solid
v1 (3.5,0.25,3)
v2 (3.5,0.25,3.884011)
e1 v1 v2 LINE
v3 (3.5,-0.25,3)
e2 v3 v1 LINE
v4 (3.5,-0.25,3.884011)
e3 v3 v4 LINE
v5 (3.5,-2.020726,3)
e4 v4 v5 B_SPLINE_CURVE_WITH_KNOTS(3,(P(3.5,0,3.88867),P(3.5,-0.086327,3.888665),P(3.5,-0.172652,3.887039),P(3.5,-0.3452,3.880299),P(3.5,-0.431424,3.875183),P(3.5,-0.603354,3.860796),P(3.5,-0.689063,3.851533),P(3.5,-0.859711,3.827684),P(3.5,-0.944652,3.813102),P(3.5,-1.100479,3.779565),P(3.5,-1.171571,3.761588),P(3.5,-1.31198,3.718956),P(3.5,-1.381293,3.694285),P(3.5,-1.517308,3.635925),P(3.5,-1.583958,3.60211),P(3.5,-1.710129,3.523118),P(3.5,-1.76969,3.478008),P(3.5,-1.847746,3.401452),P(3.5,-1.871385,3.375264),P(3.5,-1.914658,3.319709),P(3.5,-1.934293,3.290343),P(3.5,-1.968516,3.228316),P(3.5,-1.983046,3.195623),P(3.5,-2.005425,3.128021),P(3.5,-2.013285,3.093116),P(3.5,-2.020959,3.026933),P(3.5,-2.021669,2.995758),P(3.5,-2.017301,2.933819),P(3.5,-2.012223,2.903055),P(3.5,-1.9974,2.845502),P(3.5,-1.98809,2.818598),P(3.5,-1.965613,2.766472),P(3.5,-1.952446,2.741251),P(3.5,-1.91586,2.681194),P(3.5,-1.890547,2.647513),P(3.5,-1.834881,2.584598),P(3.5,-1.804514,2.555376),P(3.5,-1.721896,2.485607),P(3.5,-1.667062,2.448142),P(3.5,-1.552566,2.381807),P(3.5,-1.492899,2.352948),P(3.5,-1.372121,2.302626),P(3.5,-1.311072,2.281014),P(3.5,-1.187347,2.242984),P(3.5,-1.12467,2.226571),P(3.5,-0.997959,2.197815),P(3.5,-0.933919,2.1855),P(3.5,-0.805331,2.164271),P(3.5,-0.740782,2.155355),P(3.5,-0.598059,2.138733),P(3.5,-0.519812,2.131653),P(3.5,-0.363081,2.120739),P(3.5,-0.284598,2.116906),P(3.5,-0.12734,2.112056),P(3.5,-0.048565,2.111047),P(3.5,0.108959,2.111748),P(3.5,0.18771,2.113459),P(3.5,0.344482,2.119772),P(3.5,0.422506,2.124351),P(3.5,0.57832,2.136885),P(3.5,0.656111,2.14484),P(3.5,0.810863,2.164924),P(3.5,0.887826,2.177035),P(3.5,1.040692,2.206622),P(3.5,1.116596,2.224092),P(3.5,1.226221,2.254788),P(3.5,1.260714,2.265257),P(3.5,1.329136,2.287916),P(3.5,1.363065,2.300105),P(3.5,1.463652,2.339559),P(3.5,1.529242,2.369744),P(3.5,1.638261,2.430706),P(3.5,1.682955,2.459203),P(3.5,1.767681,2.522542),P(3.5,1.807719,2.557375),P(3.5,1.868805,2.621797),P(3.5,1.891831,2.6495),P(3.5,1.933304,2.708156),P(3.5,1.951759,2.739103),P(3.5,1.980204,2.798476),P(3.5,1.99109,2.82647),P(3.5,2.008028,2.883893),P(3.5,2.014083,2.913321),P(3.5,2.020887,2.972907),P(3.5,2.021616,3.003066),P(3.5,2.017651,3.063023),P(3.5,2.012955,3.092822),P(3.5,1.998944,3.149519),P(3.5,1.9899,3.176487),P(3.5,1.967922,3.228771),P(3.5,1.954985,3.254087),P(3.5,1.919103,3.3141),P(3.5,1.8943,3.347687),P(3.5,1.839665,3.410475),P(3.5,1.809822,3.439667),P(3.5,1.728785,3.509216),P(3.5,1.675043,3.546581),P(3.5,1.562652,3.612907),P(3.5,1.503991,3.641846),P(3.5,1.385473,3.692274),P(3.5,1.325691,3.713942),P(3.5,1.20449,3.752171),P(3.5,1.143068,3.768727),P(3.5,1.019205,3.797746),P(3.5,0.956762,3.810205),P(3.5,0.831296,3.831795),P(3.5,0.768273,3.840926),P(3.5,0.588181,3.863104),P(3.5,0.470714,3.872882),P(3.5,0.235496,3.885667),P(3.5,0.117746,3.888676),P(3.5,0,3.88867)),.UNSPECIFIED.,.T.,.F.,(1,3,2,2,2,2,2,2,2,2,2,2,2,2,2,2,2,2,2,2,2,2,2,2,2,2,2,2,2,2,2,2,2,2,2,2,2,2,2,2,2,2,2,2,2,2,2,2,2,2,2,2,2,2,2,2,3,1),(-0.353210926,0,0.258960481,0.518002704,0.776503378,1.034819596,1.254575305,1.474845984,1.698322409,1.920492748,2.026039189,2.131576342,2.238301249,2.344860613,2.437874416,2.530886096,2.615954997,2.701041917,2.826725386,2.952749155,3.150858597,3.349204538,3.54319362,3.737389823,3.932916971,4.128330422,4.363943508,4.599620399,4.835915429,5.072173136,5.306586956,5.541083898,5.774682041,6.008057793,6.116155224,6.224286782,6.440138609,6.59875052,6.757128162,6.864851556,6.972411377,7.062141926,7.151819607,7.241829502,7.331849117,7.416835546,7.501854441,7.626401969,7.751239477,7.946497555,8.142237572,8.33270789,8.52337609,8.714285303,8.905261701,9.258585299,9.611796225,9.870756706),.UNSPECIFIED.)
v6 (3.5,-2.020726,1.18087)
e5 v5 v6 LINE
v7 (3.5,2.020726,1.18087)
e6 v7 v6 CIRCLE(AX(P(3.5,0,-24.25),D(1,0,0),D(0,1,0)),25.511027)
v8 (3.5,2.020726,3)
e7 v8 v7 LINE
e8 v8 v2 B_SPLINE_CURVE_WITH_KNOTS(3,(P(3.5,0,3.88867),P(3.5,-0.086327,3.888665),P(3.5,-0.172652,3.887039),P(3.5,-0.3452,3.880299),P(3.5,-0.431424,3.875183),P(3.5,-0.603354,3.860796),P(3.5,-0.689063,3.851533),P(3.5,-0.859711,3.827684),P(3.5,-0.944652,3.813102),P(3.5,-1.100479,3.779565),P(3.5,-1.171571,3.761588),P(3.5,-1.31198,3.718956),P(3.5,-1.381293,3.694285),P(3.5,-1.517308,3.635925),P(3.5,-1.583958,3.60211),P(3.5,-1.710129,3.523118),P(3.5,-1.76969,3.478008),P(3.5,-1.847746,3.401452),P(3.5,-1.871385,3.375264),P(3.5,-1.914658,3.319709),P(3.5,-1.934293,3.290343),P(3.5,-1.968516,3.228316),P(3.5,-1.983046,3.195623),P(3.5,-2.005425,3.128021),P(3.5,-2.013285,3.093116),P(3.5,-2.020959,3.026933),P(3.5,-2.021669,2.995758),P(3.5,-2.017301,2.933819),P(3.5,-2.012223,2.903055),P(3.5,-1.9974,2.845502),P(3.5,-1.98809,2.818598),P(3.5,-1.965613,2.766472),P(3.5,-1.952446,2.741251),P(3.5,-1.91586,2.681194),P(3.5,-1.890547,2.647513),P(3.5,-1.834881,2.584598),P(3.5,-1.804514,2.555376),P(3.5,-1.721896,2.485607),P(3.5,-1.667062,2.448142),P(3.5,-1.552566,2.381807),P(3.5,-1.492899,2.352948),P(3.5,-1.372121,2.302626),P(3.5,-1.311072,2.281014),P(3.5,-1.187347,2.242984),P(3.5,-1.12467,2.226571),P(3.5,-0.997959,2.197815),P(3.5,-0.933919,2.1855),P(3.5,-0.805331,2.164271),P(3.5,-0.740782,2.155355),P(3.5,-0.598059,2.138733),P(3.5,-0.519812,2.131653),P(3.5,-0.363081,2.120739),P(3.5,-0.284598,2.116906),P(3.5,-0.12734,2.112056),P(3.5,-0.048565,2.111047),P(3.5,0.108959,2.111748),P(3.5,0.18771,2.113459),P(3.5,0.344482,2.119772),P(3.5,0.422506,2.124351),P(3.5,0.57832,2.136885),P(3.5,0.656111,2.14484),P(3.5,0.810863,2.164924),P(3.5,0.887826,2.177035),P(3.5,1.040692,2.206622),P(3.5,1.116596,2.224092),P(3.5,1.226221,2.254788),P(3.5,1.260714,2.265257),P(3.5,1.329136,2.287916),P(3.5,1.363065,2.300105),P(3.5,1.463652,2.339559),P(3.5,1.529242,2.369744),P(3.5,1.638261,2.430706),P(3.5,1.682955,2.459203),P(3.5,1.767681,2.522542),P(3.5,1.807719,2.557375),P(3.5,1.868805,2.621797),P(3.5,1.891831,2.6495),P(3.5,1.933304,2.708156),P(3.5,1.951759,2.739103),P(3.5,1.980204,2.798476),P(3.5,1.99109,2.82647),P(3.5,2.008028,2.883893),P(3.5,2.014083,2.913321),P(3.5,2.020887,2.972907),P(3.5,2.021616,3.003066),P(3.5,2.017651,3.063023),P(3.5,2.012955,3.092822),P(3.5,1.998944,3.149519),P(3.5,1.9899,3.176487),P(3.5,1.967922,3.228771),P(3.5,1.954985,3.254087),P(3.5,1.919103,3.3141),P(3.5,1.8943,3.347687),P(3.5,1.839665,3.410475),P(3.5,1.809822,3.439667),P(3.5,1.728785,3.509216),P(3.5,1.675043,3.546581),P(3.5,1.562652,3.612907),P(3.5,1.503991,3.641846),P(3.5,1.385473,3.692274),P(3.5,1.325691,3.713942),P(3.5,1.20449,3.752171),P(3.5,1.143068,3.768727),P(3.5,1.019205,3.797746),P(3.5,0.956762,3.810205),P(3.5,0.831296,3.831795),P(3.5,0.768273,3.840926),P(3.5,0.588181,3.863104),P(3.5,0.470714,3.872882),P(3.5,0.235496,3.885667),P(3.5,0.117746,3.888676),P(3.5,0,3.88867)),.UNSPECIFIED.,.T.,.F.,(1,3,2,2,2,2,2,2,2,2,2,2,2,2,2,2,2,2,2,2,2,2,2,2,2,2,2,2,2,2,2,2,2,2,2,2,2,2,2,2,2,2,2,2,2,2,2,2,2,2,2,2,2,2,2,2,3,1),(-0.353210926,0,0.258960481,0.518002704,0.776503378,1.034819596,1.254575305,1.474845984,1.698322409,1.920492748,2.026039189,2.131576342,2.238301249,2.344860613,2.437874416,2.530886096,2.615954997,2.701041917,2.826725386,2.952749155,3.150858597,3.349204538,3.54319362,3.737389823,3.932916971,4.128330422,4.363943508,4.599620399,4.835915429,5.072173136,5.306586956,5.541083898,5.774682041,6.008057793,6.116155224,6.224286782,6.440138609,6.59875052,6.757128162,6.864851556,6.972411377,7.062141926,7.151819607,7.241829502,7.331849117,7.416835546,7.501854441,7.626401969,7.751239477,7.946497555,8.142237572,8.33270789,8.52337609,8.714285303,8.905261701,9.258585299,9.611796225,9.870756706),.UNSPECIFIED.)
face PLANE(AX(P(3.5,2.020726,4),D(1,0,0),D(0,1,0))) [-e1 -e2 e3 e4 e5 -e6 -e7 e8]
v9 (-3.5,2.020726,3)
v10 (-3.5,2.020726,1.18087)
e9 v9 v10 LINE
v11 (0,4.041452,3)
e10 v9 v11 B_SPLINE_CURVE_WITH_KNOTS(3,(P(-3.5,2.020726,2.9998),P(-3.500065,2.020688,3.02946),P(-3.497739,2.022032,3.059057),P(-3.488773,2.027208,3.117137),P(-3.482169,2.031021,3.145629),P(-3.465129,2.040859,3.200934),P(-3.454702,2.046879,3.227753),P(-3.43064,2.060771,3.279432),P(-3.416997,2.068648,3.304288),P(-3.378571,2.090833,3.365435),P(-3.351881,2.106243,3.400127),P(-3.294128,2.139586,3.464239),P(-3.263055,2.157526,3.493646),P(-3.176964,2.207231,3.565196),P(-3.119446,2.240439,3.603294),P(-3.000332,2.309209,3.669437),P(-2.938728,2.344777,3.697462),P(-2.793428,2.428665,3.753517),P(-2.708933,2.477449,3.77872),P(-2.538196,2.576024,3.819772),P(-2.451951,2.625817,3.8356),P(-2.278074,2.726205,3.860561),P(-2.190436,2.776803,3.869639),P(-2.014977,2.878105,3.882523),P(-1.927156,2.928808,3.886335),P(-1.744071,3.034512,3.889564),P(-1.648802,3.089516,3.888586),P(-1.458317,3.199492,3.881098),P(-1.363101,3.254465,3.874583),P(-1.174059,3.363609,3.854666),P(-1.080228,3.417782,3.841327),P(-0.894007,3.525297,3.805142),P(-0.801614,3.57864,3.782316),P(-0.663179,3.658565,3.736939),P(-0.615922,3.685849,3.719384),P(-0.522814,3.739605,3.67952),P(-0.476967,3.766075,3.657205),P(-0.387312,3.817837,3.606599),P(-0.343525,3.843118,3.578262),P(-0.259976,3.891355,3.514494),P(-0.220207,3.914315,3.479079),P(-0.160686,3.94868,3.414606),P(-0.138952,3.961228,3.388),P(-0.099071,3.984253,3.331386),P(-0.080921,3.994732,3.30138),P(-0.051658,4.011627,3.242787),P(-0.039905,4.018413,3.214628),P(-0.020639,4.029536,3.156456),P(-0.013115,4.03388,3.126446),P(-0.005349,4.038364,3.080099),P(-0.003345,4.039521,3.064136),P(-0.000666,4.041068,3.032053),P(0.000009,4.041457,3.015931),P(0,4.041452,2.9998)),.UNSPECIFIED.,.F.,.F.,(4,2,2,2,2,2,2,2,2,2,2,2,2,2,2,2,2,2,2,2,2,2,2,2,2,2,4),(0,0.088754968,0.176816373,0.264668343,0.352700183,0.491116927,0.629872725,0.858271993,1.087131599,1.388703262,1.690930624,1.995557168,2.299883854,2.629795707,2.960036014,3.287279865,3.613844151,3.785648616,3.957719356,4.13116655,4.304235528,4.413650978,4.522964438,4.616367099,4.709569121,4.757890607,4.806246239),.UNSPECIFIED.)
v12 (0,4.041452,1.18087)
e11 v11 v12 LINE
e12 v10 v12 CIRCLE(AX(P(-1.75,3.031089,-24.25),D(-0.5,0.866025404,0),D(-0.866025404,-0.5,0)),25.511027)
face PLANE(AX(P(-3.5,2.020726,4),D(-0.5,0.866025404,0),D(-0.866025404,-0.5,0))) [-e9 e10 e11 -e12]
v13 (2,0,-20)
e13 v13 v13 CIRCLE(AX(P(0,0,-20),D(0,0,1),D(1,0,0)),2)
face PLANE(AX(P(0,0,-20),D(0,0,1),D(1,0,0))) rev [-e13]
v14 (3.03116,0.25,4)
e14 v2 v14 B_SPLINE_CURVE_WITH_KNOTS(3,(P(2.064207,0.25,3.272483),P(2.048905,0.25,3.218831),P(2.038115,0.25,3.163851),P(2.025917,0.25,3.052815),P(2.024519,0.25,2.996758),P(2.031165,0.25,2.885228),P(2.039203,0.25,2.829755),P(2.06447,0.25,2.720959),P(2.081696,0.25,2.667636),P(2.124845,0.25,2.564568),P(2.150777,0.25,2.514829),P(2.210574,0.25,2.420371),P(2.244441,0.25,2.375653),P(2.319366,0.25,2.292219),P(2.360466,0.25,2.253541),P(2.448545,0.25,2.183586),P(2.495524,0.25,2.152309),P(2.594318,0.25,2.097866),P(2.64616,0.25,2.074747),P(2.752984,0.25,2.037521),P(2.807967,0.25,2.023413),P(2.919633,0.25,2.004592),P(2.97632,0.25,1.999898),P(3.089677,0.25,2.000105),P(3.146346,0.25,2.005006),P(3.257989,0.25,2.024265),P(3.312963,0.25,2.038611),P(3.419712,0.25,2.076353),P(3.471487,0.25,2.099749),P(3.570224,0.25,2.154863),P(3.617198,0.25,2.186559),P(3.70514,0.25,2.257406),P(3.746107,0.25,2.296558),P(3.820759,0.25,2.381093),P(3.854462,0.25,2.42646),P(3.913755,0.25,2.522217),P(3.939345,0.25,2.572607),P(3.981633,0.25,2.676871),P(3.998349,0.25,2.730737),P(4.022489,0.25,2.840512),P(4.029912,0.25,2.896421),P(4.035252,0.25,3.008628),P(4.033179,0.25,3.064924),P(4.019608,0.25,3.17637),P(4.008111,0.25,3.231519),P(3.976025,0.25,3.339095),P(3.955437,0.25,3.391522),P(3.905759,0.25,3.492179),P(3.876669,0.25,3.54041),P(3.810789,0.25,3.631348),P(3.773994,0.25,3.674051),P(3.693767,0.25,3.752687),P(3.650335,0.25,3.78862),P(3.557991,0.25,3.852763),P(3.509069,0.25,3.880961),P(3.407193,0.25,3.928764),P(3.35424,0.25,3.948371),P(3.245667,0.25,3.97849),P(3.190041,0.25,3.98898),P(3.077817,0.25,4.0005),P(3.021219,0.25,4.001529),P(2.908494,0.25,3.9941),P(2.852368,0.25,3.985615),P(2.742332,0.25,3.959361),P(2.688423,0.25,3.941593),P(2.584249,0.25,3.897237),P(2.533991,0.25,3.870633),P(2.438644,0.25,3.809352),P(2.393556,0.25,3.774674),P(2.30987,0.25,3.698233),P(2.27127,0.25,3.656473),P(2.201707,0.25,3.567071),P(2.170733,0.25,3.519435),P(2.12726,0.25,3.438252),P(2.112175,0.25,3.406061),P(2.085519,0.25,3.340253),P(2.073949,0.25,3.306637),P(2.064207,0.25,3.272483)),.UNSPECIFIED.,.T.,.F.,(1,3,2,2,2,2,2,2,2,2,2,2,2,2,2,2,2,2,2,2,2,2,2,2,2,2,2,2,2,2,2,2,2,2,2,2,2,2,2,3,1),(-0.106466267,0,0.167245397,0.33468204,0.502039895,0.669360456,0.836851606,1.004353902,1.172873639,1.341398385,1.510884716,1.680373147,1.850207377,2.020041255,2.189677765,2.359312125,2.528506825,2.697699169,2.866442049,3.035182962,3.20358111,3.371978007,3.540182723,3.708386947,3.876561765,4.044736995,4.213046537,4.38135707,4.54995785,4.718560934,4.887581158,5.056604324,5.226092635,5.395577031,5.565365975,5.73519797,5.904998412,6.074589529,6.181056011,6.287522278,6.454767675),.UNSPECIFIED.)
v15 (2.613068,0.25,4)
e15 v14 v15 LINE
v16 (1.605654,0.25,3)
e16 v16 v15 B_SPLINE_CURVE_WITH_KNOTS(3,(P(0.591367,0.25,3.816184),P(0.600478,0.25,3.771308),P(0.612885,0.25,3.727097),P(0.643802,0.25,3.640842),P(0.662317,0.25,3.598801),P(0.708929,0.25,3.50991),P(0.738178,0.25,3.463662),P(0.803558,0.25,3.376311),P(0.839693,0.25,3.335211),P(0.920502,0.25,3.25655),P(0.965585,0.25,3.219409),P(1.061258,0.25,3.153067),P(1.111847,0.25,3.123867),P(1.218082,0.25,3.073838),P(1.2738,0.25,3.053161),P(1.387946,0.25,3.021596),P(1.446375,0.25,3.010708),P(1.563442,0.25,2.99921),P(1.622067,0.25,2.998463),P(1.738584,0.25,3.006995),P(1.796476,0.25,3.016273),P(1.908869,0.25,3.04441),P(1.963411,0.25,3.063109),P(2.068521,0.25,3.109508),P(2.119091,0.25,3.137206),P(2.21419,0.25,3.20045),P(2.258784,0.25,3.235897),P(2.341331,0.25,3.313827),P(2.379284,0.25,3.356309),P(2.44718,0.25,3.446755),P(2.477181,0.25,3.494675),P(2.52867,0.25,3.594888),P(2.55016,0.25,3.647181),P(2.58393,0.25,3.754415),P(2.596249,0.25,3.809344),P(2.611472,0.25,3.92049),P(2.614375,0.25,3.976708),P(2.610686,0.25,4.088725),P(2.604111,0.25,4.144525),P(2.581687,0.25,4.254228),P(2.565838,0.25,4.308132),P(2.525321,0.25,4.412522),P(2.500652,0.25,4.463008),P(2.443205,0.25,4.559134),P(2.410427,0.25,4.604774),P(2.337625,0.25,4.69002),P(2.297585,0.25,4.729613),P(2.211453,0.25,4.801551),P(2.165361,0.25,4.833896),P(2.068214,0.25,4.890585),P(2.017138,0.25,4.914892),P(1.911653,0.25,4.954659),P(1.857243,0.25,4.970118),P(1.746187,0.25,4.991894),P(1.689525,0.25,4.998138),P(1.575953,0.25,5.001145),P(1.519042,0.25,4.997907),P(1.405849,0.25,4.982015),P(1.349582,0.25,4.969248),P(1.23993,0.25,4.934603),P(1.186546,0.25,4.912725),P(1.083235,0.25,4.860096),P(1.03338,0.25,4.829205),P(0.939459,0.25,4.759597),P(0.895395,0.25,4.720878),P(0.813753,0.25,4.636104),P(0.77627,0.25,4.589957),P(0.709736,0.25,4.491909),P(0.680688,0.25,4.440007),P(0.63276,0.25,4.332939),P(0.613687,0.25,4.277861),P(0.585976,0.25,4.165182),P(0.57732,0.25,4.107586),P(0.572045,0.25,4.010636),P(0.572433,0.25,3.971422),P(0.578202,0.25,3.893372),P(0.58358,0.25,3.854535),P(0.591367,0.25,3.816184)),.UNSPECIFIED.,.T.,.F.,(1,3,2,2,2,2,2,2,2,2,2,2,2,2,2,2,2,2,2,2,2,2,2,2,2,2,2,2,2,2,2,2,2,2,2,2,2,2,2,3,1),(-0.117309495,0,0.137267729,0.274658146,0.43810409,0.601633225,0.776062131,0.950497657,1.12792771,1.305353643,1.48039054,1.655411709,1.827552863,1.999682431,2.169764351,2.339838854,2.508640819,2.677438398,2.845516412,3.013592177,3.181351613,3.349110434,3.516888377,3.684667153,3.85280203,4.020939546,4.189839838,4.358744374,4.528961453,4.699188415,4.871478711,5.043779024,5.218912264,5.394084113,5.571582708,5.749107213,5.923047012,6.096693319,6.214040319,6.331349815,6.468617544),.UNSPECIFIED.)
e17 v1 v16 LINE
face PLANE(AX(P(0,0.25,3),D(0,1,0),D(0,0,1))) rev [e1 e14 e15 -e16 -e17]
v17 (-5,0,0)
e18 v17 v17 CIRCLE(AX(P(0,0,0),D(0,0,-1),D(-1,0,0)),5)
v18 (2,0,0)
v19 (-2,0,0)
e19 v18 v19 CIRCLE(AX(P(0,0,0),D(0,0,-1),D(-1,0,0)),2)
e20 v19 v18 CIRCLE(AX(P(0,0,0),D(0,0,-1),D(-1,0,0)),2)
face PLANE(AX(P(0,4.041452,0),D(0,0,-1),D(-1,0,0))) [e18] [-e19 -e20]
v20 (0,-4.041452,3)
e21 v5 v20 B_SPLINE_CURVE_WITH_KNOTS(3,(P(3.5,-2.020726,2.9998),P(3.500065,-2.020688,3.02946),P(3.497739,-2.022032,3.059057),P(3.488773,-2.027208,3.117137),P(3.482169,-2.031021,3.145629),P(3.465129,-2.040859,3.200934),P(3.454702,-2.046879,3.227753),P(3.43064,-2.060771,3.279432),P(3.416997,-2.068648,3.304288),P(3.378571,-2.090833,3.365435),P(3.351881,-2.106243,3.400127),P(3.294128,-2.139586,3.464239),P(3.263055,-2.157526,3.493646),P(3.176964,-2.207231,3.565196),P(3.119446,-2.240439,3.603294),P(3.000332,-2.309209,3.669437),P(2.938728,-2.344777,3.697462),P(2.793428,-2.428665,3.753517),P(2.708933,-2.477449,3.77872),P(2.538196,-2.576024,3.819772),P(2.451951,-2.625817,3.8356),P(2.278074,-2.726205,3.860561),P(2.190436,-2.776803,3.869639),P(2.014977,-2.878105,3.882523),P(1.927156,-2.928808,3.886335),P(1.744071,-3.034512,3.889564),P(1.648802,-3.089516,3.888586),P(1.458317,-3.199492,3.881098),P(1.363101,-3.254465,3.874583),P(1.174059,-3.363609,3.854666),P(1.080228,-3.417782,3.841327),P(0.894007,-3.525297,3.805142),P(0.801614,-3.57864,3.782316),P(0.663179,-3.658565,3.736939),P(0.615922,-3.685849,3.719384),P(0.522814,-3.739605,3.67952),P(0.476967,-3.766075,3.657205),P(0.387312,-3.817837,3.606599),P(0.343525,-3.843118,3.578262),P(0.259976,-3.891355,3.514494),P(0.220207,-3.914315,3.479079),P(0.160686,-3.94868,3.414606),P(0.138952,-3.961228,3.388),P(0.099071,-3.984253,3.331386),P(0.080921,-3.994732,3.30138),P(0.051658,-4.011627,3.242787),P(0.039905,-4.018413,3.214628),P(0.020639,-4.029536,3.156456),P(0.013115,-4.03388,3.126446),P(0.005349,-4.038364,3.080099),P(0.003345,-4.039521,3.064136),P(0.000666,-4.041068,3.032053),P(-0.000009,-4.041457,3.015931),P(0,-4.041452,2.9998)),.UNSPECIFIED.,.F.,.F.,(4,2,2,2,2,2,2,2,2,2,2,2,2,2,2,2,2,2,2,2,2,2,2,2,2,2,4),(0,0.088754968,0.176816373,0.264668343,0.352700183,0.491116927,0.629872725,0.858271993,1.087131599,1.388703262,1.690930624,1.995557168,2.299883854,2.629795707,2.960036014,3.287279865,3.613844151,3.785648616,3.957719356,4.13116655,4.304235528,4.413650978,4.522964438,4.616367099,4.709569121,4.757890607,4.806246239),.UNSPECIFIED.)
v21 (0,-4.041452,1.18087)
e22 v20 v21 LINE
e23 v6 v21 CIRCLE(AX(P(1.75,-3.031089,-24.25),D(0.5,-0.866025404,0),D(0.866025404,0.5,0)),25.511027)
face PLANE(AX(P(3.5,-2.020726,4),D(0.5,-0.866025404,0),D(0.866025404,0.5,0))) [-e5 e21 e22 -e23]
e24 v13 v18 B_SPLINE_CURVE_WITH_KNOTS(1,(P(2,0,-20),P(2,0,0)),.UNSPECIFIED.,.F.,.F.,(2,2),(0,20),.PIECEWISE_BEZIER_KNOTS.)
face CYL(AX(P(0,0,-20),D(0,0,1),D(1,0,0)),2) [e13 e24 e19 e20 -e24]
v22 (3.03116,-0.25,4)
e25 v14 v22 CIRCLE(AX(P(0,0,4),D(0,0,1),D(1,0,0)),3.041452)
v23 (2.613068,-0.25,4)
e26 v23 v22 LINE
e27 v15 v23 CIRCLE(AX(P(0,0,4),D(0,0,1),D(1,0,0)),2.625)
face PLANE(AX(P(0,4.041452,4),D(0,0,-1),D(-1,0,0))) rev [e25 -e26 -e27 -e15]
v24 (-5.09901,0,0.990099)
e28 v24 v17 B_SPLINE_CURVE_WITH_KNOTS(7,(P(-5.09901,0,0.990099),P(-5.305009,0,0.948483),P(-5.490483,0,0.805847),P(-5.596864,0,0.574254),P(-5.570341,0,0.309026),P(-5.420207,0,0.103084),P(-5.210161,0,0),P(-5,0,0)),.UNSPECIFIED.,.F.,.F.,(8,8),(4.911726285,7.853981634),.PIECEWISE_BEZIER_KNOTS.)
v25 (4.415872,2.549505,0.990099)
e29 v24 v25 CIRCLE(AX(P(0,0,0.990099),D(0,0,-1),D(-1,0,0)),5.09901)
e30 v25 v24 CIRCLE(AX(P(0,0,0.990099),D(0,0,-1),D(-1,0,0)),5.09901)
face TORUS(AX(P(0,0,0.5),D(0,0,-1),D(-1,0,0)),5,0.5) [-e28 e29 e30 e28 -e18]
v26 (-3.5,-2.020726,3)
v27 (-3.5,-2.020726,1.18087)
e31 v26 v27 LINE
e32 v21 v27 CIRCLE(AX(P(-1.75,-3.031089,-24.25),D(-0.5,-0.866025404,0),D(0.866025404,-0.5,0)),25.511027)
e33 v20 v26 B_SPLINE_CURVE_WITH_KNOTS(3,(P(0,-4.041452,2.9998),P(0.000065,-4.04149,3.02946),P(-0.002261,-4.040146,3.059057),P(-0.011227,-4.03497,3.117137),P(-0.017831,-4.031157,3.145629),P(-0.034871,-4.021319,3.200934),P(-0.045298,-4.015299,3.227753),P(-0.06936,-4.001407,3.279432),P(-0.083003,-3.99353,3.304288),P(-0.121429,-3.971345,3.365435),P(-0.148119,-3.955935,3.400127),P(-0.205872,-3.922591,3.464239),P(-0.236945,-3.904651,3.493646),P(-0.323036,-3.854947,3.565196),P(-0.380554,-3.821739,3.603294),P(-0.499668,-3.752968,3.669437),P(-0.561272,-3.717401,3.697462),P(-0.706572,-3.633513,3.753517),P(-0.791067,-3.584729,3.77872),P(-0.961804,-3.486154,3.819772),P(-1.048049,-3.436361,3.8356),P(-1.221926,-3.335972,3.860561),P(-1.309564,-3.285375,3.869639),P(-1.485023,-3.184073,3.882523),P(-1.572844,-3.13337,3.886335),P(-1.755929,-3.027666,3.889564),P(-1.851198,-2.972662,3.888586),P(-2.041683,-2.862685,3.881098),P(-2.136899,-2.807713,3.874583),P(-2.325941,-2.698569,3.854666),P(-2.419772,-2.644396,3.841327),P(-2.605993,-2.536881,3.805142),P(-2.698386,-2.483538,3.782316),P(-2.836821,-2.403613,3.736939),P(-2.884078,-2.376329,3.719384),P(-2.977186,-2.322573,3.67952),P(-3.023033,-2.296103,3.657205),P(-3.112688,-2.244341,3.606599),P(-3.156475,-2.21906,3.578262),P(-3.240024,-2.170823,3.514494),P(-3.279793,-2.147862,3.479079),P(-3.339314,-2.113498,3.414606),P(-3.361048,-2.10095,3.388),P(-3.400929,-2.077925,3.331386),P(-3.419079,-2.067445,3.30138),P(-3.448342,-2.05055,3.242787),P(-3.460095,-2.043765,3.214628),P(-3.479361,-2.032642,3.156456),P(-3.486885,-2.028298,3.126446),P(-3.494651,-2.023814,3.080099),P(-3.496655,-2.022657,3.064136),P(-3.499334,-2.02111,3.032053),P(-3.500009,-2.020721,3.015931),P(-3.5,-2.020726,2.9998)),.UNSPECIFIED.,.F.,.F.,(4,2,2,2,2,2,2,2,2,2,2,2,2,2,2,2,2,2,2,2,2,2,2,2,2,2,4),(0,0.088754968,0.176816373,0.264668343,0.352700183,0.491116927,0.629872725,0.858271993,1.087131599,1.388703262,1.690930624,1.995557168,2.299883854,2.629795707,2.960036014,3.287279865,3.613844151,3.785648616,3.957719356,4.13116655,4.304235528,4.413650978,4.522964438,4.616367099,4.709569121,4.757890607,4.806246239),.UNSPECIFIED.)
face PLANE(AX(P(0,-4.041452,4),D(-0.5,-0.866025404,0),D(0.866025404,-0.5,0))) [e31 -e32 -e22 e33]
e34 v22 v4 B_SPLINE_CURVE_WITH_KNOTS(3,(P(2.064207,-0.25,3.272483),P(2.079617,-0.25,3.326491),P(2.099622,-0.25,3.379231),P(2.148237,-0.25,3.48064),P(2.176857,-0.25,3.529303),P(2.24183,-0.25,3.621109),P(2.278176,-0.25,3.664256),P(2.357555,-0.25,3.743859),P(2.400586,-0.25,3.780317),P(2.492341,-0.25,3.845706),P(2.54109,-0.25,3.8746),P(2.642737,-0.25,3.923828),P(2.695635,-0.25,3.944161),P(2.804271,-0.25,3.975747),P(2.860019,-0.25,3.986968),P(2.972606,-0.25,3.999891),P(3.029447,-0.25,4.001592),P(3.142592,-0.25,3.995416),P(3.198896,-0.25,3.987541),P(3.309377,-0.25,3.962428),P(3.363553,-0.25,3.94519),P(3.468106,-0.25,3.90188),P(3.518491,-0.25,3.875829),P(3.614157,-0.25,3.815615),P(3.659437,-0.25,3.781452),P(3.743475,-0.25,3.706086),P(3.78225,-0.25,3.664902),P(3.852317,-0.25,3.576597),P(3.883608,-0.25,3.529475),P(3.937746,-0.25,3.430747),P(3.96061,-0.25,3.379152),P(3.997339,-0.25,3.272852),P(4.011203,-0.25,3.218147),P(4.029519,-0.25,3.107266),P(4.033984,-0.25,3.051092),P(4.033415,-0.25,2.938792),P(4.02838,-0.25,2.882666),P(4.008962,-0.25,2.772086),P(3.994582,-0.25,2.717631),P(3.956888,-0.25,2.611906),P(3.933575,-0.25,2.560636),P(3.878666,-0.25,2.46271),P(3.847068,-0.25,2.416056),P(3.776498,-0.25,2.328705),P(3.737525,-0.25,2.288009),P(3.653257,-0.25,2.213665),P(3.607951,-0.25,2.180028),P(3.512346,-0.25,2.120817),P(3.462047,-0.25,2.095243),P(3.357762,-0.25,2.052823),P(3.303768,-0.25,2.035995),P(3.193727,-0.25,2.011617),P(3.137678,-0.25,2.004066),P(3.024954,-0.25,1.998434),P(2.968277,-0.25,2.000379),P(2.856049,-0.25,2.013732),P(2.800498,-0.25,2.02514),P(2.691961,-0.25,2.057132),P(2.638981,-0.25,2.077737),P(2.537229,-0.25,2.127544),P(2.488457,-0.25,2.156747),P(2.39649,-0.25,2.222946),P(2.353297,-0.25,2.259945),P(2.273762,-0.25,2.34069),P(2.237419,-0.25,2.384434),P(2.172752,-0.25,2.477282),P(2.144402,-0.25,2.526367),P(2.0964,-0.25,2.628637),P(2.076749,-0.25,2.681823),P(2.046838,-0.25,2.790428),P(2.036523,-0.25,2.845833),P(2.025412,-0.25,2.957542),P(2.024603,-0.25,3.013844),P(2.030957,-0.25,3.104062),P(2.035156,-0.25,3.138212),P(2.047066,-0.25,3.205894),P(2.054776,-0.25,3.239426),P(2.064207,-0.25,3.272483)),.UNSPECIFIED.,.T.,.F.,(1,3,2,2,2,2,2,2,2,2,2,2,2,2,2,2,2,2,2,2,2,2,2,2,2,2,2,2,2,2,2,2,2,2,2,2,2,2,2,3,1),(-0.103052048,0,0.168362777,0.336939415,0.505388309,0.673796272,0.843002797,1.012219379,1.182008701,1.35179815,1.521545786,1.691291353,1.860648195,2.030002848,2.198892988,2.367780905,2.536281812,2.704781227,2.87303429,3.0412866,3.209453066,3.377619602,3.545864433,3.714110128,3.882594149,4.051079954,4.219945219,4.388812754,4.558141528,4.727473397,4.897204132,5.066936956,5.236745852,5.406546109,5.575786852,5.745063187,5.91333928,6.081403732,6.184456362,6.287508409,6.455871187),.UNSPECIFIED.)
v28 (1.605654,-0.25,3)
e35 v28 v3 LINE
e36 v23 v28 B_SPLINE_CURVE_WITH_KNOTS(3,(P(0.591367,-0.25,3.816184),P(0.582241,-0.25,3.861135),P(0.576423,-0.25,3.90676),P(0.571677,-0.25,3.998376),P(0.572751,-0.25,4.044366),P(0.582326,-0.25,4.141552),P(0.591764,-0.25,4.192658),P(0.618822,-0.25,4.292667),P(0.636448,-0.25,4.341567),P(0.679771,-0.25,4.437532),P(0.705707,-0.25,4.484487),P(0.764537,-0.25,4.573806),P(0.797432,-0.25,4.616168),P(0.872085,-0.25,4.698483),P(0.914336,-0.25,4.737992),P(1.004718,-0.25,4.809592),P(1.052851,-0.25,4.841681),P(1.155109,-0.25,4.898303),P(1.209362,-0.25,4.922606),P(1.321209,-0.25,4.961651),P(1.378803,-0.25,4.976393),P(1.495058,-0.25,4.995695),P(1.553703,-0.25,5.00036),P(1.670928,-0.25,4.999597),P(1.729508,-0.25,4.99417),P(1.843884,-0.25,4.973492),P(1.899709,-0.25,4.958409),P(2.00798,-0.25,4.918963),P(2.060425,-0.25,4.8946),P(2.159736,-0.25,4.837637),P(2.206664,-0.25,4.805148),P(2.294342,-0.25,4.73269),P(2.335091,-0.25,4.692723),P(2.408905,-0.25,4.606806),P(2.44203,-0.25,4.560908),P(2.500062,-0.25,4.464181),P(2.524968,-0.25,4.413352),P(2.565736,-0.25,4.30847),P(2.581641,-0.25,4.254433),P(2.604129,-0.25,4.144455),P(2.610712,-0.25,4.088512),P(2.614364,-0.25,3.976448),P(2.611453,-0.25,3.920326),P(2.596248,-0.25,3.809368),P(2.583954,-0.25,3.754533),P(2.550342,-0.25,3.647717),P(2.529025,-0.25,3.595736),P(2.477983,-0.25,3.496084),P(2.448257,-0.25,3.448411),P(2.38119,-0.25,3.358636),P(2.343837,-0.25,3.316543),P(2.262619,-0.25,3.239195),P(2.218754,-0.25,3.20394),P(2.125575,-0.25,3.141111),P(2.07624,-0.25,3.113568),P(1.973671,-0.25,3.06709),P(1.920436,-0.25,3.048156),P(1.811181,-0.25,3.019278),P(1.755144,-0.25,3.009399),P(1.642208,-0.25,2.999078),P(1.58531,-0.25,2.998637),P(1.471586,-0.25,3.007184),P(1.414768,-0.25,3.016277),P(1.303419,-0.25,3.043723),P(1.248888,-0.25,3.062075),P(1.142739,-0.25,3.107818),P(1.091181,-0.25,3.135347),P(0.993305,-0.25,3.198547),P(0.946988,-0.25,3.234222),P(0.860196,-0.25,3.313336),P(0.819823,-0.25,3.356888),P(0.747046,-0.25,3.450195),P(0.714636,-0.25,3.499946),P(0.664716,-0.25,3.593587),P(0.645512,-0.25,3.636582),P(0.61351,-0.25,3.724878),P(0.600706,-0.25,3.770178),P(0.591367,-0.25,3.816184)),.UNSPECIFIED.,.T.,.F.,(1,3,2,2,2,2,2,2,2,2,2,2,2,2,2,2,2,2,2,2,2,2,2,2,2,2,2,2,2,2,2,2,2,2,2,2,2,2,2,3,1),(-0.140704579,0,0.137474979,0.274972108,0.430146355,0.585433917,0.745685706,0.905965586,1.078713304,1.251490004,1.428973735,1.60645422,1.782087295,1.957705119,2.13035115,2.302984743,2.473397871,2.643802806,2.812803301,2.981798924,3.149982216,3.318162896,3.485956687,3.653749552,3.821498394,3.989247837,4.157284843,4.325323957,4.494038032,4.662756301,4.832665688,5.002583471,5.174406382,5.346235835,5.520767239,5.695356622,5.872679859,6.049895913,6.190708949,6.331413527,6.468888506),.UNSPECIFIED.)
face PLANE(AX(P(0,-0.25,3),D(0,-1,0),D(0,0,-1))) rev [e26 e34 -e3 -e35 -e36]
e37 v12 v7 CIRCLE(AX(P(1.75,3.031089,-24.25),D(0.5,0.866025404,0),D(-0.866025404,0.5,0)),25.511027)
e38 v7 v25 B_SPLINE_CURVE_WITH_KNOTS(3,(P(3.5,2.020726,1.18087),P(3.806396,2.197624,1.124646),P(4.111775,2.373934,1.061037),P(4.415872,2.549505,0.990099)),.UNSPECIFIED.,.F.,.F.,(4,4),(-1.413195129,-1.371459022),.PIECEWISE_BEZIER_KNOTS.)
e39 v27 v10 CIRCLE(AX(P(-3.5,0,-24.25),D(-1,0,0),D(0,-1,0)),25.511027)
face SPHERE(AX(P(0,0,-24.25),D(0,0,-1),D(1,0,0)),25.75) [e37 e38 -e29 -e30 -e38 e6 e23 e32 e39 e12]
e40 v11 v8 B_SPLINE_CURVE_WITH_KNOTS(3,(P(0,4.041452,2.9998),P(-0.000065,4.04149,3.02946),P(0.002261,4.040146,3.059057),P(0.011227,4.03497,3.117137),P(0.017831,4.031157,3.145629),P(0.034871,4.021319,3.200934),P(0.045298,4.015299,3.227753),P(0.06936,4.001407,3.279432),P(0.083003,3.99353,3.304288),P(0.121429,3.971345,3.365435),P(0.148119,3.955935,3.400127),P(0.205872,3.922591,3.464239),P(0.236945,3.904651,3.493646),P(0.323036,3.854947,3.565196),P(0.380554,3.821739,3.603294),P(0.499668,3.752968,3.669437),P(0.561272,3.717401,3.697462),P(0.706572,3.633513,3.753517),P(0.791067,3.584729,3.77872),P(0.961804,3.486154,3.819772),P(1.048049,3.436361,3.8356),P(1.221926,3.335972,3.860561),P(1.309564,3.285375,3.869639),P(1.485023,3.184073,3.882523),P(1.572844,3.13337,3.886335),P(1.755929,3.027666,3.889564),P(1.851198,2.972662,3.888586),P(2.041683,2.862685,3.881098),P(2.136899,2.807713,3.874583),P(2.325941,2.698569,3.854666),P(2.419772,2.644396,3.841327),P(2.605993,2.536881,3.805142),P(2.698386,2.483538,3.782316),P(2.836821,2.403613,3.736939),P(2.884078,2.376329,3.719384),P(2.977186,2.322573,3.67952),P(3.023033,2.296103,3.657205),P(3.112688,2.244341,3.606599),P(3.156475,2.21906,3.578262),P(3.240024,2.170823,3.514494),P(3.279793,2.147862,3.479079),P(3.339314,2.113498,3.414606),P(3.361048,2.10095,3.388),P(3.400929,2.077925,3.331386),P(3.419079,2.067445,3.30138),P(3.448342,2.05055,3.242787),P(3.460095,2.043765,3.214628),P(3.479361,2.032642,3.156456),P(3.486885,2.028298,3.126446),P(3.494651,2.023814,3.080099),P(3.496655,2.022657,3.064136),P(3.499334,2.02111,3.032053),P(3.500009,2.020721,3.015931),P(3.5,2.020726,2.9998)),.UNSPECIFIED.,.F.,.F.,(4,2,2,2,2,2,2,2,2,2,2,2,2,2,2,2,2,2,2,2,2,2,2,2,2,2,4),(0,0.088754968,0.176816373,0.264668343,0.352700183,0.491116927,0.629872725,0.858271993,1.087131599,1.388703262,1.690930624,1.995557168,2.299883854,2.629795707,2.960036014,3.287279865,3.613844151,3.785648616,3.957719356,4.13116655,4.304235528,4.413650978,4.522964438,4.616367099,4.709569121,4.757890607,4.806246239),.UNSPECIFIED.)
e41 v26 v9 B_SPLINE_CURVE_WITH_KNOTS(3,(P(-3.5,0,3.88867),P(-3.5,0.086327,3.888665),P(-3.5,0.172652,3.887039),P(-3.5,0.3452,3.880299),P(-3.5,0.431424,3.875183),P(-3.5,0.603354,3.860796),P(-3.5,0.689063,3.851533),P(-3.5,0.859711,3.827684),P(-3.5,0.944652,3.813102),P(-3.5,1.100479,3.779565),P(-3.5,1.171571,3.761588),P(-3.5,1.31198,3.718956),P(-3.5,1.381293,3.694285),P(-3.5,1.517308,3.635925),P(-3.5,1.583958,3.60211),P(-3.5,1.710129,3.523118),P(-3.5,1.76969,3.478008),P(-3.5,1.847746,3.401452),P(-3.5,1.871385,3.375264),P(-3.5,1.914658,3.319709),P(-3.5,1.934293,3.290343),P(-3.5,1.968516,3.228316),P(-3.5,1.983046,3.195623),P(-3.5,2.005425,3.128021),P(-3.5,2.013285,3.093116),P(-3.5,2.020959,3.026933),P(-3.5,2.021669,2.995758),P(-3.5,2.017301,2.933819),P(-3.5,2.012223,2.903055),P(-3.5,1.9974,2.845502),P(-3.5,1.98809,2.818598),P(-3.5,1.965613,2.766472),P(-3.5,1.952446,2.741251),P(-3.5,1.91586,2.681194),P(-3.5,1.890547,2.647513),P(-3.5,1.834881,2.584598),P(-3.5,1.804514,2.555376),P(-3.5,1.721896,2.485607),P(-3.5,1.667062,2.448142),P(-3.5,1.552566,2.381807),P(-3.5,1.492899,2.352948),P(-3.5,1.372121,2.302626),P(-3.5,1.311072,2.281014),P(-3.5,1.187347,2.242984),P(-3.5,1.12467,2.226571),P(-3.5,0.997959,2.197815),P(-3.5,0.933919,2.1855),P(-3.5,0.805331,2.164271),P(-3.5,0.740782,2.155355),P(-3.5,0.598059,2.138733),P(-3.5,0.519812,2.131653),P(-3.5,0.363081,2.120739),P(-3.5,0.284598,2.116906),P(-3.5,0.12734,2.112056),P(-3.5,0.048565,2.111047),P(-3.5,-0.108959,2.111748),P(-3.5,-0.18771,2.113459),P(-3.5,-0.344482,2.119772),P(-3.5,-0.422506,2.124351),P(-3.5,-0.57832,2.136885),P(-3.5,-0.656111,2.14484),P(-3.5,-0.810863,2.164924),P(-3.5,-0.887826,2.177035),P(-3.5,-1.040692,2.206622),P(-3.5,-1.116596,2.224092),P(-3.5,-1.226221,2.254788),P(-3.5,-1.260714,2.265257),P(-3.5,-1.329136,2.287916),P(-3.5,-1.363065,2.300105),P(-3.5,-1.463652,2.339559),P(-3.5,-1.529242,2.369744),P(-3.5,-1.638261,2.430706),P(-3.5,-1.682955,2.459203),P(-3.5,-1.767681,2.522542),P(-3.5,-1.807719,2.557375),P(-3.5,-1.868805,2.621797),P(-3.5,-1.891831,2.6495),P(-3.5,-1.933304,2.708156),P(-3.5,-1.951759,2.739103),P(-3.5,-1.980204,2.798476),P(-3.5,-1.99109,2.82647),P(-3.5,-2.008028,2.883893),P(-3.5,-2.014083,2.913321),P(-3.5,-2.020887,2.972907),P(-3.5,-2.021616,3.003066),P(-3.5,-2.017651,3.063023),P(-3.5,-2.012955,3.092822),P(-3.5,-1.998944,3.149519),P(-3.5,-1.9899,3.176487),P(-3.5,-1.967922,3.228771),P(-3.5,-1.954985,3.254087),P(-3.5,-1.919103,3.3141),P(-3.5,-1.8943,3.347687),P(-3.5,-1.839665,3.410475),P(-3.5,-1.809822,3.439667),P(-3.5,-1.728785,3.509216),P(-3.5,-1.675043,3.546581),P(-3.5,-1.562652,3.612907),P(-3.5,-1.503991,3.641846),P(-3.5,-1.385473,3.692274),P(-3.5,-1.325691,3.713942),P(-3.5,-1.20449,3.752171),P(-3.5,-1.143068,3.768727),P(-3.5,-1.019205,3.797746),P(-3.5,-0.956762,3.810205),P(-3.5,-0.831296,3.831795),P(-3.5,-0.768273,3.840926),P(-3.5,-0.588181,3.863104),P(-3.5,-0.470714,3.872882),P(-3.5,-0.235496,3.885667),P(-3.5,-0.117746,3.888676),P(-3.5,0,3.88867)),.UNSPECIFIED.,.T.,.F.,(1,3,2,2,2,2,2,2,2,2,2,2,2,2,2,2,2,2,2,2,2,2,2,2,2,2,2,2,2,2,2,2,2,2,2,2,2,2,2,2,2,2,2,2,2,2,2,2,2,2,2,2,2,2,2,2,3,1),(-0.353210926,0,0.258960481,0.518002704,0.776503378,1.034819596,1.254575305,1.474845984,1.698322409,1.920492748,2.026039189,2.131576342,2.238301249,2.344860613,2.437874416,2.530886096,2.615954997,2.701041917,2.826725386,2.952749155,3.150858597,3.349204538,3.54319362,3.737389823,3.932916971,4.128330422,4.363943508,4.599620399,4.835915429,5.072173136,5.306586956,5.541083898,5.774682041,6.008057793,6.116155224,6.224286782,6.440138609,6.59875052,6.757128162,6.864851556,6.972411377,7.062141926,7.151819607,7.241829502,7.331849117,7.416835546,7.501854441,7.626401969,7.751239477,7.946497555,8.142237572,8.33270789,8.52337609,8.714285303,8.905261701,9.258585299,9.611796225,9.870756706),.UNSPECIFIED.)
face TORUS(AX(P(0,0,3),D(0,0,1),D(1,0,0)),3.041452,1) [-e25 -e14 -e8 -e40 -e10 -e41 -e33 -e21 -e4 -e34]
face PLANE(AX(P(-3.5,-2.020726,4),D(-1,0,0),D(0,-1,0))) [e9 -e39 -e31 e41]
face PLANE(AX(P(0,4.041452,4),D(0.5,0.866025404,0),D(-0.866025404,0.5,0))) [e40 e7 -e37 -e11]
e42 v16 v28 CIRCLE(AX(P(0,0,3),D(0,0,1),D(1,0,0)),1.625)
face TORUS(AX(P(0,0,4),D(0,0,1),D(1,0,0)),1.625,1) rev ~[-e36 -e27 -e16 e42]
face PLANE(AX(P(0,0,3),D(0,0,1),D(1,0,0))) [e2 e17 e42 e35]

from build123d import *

# Parameters (mm, degrees)
HEAD_DEPTH         = 4
SHANK_SKETCH_R     = 2
SHANK_DEPTH        = 20
SKETCH6_R          = 2.625
HEAD_CUT_DEPTH     = 1
FILLET1_R          = 1
SKETCH8_W          = 3.5
SKETCH8_H          = 0.5
CUT_EXTRUDE3_DEPTH = 1


with BuildPart() as part:
    # Head Sketch → Head (new body)
    with BuildSketch(Plane.XY):
        Polygon((0, 4.041451884), (3.5, 2.020725942), (3.5, -2.020725942), (0, -4.041451884), (-3.5, -2.020725942), (-3.5, 2.020725942), align=None)
    extrude(amount=HEAD_DEPTH)

    # Shank Sketch → Shank (add)
    with BuildSketch(Plane.XY):
        Circle(SHANK_SKETCH_R)
    extrude(amount=-SHANK_DEPTH)

    # Sketch3 → Flange (revolve)
    with BuildSketch(Plane(origin=(0, 0, 0), x_dir=(-1, 0, 0), z_dir=(0, 1, 0)), mode=Mode.PRIVATE) as flange_sk:
        with BuildLine():
            Line((-5, 0), (0, 0))
            Line((0, 0), (0, 1.5))
            ThreePointArc((0, 1.5), (-2.562220765, 1.372207648), (-5.099009901, 0.99009901))
            ThreePointArc((-5.099009901, 0.99009901), (-5.497518595, 0.45024814), (-5, 0))
        make_face()
    revolve(flange_sk.sketch.rotate(Axis((0, 0, 0), (0, 0, 1)), 30), axis=Axis((0, 0, 0), (0, 0, 1)))

    # Sketch5 → Head Trim (revolve, cut)
    with BuildSketch(Plane(origin=(0, 0, 0), x_dir=(0, 0, -1), z_dir=(1, 0, 0)), mode=Mode.PRIVATE) as head_trim_sk:
        with BuildLine():
            Line((-4, -3.041451884), (-4, -4.041451884))
            Line((-4, -4.041451884), (-3, -4.041451884))
            ThreePointArc((-3, -4.041451884), (-3.707106781, -3.748558666), (-4, -3.041451884))
        make_face()
    revolve(head_trim_sk.sketch.rotate(Axis((0, 0, 15.085599173), (0, 0, -1)), 90), axis=Axis((0, 0, 15.085599173), (0, 0, -1)), mode=Mode.SUBTRACT)

    # Sketch6 → Head Cut (cut)
    with BuildSketch(Plane.XY.offset(4)):
        Circle(SKETCH6_R)
    extrude(amount=-HEAD_CUT_DEPTH, mode=Mode.SUBTRACT)

    # Fillet1
    fillet1_edges = [part.edges().sort_by_distance(p)[0] for p in [
        (-2.625, 0, 3),
    ]]
    fillet(fillet1_edges, radius=FILLET1_R - 0.0001)  # a hair under: the kernel refuses the full size

    # Sketch8 → Cut-Extrude3 (cut)
    with BuildSketch(Plane.XY.offset(4)):
        with Locations((1.75, 0)):
            Rectangle(SKETCH8_W, SKETCH8_H)
    extrude(amount=-CUT_EXTRUDE3_DEPTH, mode=Mode.SUBTRACT)


solid = part.part
